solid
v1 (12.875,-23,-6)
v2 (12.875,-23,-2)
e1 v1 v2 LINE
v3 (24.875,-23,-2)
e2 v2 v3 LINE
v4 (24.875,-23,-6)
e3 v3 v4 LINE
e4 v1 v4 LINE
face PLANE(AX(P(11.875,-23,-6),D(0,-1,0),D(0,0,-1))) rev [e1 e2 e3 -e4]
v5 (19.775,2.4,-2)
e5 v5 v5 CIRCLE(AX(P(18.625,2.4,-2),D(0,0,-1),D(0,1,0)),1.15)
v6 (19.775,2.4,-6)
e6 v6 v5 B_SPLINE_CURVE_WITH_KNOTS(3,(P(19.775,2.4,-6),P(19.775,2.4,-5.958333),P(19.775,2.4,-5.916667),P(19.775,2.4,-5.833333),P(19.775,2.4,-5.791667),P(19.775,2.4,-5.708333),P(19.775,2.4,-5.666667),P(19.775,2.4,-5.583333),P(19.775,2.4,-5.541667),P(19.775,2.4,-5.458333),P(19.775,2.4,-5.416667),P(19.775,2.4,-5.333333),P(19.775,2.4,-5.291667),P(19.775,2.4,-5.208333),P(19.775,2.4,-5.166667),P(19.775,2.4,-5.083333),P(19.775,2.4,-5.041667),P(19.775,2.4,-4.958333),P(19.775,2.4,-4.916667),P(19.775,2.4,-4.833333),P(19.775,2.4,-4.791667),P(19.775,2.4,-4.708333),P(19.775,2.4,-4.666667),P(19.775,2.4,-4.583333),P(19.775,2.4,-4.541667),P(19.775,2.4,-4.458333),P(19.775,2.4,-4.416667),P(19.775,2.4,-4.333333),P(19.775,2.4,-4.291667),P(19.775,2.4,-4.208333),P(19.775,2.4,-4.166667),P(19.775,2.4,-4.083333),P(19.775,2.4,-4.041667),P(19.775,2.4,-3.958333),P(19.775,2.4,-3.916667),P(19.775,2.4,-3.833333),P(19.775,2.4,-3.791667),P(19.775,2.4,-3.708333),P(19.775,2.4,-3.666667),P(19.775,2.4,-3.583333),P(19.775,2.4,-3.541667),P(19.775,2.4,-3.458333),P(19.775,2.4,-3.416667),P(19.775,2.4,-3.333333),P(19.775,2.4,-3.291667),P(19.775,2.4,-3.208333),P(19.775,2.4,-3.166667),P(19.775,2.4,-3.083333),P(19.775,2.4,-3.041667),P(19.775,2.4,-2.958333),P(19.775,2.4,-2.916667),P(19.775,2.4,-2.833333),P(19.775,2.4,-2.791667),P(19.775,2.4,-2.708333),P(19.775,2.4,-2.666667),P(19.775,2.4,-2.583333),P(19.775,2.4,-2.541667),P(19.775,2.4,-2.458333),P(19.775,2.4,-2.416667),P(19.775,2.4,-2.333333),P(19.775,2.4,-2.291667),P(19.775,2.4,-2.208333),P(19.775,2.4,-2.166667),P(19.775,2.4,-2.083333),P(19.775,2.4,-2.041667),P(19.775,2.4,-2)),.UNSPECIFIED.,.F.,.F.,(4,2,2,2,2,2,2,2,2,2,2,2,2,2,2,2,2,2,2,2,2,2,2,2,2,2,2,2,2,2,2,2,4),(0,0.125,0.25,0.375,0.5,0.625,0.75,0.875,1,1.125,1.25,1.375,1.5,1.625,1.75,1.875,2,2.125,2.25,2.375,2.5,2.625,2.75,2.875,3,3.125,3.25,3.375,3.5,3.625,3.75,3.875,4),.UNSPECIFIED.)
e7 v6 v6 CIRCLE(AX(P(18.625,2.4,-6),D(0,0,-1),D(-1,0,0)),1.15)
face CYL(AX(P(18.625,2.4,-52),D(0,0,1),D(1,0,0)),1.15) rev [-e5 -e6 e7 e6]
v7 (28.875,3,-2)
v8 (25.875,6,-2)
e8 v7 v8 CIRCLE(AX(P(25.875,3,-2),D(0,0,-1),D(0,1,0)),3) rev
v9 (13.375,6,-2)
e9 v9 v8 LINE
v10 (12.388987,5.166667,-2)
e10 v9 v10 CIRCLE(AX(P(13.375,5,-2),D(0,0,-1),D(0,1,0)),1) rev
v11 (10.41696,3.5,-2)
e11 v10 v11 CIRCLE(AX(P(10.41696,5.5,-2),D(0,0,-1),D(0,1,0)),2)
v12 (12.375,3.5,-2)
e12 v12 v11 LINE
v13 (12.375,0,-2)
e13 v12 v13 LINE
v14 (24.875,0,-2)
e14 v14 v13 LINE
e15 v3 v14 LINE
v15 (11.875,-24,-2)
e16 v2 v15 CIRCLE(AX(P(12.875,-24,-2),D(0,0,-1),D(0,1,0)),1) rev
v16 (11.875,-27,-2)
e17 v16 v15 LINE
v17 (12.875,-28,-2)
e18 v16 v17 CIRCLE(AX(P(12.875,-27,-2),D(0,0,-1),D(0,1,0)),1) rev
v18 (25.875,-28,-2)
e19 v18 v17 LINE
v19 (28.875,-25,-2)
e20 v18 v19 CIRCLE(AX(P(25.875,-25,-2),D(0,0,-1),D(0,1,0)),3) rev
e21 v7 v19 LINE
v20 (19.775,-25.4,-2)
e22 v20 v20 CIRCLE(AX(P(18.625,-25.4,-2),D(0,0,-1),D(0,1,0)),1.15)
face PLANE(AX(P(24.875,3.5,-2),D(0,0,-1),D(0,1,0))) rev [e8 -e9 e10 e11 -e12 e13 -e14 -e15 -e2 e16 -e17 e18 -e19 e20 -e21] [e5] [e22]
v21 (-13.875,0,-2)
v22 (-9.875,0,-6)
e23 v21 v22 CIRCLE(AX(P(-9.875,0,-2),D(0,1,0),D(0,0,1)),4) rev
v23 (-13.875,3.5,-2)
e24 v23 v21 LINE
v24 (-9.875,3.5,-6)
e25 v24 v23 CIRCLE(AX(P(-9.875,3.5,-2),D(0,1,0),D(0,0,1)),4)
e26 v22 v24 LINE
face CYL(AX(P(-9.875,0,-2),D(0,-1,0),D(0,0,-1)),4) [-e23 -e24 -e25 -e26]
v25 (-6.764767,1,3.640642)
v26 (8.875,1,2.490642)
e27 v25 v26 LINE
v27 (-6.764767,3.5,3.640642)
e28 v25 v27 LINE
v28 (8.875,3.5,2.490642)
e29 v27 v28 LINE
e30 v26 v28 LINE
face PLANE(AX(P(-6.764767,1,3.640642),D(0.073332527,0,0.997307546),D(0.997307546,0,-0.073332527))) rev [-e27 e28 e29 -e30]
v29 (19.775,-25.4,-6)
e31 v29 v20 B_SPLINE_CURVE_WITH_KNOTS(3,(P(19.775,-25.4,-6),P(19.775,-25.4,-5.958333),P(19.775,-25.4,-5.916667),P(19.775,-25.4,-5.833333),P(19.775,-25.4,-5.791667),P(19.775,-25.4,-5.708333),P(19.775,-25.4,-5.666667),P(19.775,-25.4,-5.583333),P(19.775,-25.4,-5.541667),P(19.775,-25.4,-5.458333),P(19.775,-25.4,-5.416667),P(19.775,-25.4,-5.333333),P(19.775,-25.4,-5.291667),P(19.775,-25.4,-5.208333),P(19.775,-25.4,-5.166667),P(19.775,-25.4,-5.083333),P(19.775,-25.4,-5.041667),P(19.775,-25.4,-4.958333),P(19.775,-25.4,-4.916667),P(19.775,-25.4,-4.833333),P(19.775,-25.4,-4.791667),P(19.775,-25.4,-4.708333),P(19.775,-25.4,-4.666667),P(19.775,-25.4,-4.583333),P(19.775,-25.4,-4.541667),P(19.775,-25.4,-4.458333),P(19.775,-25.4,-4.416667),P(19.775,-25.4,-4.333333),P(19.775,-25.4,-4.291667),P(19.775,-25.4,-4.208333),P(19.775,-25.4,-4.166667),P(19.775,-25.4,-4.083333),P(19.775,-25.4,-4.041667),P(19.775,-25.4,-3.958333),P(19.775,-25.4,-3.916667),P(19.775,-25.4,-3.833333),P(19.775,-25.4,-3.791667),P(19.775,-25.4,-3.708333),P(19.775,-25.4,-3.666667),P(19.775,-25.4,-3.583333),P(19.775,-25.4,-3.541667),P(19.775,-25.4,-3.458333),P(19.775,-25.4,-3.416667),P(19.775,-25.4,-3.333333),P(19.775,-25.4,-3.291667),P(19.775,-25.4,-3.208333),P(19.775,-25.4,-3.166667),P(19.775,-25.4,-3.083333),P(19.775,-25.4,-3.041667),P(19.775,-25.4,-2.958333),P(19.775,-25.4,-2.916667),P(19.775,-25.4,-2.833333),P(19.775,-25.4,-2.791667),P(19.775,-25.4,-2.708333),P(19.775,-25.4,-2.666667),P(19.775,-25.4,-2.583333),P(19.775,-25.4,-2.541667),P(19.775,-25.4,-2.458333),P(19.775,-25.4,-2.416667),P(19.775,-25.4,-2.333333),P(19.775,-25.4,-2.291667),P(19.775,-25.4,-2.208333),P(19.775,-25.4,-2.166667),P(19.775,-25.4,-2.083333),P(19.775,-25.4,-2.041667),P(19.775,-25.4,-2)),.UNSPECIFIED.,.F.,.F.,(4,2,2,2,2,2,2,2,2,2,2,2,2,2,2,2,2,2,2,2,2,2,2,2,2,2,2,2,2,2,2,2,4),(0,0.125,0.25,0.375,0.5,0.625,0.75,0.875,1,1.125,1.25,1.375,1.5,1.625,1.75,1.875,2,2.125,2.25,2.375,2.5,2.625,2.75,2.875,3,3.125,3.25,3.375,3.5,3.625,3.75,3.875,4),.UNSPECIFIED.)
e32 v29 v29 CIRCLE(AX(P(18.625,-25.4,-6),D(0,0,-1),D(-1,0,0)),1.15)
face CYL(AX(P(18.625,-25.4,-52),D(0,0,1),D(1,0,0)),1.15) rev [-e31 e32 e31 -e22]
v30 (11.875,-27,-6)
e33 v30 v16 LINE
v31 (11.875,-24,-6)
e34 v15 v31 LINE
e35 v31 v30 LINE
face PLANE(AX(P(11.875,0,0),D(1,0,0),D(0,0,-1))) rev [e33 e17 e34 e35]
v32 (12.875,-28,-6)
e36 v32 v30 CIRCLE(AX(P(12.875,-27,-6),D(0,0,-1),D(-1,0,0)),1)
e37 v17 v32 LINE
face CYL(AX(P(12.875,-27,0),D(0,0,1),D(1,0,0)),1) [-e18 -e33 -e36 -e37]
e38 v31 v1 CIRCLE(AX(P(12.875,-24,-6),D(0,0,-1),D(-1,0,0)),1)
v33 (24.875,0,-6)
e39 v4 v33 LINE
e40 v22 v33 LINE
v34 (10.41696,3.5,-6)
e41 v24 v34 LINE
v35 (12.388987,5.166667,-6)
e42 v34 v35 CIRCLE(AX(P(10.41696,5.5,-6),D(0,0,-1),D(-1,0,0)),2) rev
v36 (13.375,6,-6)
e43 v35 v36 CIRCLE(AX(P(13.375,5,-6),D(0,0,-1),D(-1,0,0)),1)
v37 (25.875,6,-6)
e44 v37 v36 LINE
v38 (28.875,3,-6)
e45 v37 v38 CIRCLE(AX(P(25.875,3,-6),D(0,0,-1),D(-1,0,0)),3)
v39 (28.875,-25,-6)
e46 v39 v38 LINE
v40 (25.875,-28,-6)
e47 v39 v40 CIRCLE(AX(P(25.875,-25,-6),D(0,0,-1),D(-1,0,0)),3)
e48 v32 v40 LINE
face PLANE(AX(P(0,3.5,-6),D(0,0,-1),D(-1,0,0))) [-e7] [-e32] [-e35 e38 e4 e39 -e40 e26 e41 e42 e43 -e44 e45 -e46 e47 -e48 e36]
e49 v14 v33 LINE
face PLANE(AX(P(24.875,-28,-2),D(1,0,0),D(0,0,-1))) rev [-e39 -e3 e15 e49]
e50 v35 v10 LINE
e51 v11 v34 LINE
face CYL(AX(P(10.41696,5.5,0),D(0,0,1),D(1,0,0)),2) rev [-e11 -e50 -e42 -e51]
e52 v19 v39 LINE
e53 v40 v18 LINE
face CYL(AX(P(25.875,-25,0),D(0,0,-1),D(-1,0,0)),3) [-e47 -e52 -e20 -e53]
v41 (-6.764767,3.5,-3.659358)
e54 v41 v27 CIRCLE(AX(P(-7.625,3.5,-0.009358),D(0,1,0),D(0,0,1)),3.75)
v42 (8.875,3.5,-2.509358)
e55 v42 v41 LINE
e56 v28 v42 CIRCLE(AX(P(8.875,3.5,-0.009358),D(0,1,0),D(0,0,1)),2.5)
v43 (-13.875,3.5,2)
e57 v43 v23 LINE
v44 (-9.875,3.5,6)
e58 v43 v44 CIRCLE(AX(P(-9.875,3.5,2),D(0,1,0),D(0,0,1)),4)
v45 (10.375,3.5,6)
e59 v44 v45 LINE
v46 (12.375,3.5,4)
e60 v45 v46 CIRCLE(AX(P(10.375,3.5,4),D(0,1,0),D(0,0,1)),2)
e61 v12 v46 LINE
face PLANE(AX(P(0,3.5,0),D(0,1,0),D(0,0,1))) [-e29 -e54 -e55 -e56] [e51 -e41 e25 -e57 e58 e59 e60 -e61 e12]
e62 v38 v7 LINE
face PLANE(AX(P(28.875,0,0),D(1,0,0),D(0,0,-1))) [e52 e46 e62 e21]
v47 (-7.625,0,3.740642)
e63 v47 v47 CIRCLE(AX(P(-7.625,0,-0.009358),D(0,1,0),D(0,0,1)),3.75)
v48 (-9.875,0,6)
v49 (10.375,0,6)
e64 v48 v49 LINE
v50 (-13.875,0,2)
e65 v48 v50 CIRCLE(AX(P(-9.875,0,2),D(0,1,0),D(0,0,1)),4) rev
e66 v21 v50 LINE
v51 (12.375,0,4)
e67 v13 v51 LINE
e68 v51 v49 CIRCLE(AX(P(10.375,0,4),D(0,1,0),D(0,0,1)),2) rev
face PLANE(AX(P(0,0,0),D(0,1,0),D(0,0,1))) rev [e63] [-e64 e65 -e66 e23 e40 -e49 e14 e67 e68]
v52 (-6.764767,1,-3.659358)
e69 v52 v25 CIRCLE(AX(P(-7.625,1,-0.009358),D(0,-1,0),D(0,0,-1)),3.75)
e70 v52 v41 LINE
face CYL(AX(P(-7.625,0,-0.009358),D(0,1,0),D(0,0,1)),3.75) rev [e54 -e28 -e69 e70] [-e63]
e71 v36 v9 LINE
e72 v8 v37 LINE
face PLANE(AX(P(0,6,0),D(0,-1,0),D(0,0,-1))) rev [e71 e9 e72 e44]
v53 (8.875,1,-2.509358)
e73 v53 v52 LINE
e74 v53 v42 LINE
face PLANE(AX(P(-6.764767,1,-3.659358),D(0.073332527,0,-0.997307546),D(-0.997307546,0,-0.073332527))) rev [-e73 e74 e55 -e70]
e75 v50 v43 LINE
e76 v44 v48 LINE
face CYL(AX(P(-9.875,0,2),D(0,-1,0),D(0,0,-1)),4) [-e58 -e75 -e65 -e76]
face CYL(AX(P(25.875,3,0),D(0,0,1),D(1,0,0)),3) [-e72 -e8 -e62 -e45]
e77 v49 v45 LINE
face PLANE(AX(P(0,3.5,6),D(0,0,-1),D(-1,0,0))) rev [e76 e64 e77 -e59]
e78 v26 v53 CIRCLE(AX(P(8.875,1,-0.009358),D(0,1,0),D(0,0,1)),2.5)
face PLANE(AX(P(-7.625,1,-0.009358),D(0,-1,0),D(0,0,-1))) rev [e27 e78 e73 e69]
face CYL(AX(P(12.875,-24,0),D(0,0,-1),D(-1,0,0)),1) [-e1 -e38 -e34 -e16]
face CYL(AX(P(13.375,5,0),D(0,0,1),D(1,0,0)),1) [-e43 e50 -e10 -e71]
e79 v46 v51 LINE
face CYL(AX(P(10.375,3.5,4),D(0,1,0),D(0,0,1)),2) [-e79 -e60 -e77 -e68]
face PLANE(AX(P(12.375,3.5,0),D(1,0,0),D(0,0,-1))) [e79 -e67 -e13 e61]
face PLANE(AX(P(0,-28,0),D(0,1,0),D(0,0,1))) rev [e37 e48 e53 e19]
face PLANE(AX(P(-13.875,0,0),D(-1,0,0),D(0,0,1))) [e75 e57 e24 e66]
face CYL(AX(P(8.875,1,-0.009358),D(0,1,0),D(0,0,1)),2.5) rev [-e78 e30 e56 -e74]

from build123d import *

# Parameters (mm, degrees)
SKETCH1_W               = 24.75
SKETCH1_H               = 12
BOSS_EXTRUDE1_DEPTH     = 3.5
SKETCH2_R               = 3.75
CUT_EXTRUDE1_DEPTH      = 15.191216474
CUT_EXTRUDE4_DEPTH      = 2.5
SKETCH5_W               = 4
SKETCH5_H               = 3.5
BOSS_EXTRUDE2_DEPTH     = 12.5
SKETCH6_W               = 4
SKETCH6_H               = 3.5
BOSS_EXTRUDE3_DEPTH     = 4
SKETCH7_W               = 4
SKETCH7_H               = 4
BOSS_EXTRUDE4_DEPTH     = 28
SKETCH8_W               = 4
SKETCH8_H               = 5
BOSS_EXTRUDE5_DEPTH     = 13
SKETCH9_W               = 16.5
SKETCH9_H               = 4
BOSS_EXTRUDE6_DEPTH     = 2.5
CUT_EXTRUDE5_DEPTH      = 42.009335827
CUT_EXTRUDE5_DEPTH_BACK = 50
SKETCH10_R              = 1.15
FILLET4_R               = 1
SKETCH13_W              = 12
SKETCH13_H              = 3.5
BOSS_EXTRUDE7_DEPTH     = 1.5
FILLET5_R               = 4
FILLET6_R               = 4
FILLET7_R               = 2
FILLET8_R               = 3
FILLET9_R               = 2


with BuildPart() as part:
    # Sketch1 → Boss-Extrude1 (new body)
    with BuildSketch(Plane(origin=(0, 0, 0), x_dir=(1, 0, 0), z_dir=(0, 1, 0))):
        Rectangle(SKETCH1_W, SKETCH1_H)
    extrude(amount=BOSS_EXTRUDE1_DEPTH)

    # Sketch2 → Cut-Extrude1 (cut, through all)
    with BuildSketch(Plane(origin=(0, 3.5, 0), x_dir=(1, 0, 0), z_dir=(0, 1, 0))):
        with Locations(Location((-7.625, 0.009358416, 0), (0, 0, 270))):
            Circle(SKETCH2_R)
    extrude(amount=-CUT_EXTRUDE1_DEPTH, mode=Mode.SUBTRACT)

    # Sketch4 → Cut-Extrude4 (cut)
    with BuildSketch(Plane(origin=(0, 3.5, 0), x_dir=(1, 0, 0), z_dir=(0, 1, 0))):
        with BuildLine():
            Line((-6.764767473, 3.659358416), (8.875, 2.509358416))
            ThreePointArc((8.875, 2.509358416), (11.375, 0.009358416), (8.875, -2.490641584))
            Line((8.875, -2.490641584), (-6.764767473, -3.640641584))
            ThreePointArc((-6.764767473, -3.640641584), (-3.875, 0.009358416), (-6.764767473, 3.659358416))
        make_face()
    extrude(amount=-CUT_EXTRUDE4_DEPTH, mode=Mode.SUBTRACT)

    # Sketch5 → Boss-Extrude2 (add)
    with BuildSketch(Plane(origin=(12.375, 0, 0), x_dir=(0, 0, -1), z_dir=(1, 0, 0))):
        with Locations((4, 1.75)):
            Rectangle(SKETCH5_W, SKETCH5_H)
    extrude(amount=BOSS_EXTRUDE2_DEPTH)

    # Sketch6 → Boss-Extrude3 (add)
    with BuildSketch(Plane(origin=(24.875, 0, 0), x_dir=(0, 0, -1), z_dir=(1, 0, 0))):
        with Locations((4, 1.75)):
            Rectangle(SKETCH6_W, SKETCH6_H)
    extrude(amount=BOSS_EXTRUDE3_DEPTH)

    # Sketch7 → Boss-Extrude4 (add)
    with BuildSketch(Plane.XZ):
        with Locations((26.875, -4)):
            Rectangle(SKETCH7_W, SKETCH7_H)
    extrude(amount=BOSS_EXTRUDE4_DEPTH)

    # Sketch8 → Boss-Extrude5 (add)
    with BuildSketch(Plane.ZY.offset(-24.875)):
        with Locations((-4, -25.5)):
            Rectangle(SKETCH8_W, SKETCH8_H)
    extrude(amount=BOSS_EXTRUDE5_DEPTH)

    # Sketch9 → Boss-Extrude6 (add)
    with BuildSketch(Plane(origin=(0, 3.5, 0), x_dir=(1, 0, 0), z_dir=(0, 1, 0))):
        with Locations((20.625, 4)):
            Rectangle(SKETCH9_W, SKETCH9_H)
    extrude(amount=BOSS_EXTRUDE6_DEPTH)

    # Sketch10 → Cut-Extrude5 (cut, two sides: drawn at the far end of the back side and taken through both)
    with BuildSketch(Plane.XY.offset(-2).offset(-CUT_EXTRUDE5_DEPTH_BACK)):
        with Locations((18.625, 2.4)):
            Circle(SKETCH10_R)
        with Locations((18.625, -25.4)):
            Circle(SKETCH10_R)
    extrude(amount=CUT_EXTRUDE5_DEPTH + CUT_EXTRUDE5_DEPTH_BACK, mode=Mode.SUBTRACT)

    # Fillet4
    fillet4_edges = [part.edges().sort_by_distance(p)[0] for p in [
        (11.875, -28, -4),
        (11.875, -23, -4),
        (12.375, 6, -4),
    ]]
    fillet(fillet4_edges, radius=FILLET4_R)

    # Sketch13 → Boss-Extrude7 (add)
    with BuildSketch(Plane.ZY.offset(12.375)):
        with Locations((0, 1.75)):
            Rectangle(SKETCH13_W, SKETCH13_H)
    extrude(amount=BOSS_EXTRUDE7_DEPTH)

    # Fillet5
    fillet5_edges = [part.edges().sort_by_distance(p)[0] for p in [
        (-13.875, 1.75, 6),
    ]]
    fillet(fillet5_edges, radius=FILLET5_R)

    # Fillet6
    fillet6_edges = [part.edges().sort_by_distance(p)[0] for p in [
        (-13.875, 1.75, -6),
    ]]
    fillet(fillet6_edges, radius=FILLET6_R)

    # Fillet7
    fillet7_edges = [part.edges().sort_by_distance(p)[0] for p in [
        (12.375, 1.75, 6),
    ]]
    fillet(fillet7_edges, radius=FILLET7_R)

    # Fillet8
    fillet8_edges = [part.edges().sort_by_distance(p)[0] for p in [
        (28.875, -28, -4),
        (28.875, 6, -4),
    ]]
    fillet(fillet8_edges, radius=FILLET8_R)

    # Fillet9
    # the kernel refuses this fillet: 2 mm, written as the material it adds along each edge
    with BuildSketch(Plane(origin=(12.375, 3.5, -6), x_dir=(0.008391726197268362, 0.9999647888458023, 0), z_dir=(0, 0, 1))) as fillet9_piece_1:
        with BuildLine():
            CenterArc((1.983498243, 1.974754399), FILLET9_R, 180.480816137, 80.405931773)
            Line((-0.016431335, 1.957970947), (-0.216424292, 1.956292601))
            Line((-0.216424292, 1.956292601), (-0.199992958, -0.001678345))
            Line((-0.199992958, -0.001678345), (0.001678345, -0.199992958))
            ThreePointArc((0.001678345, -0.199992958), (1.501625529, -0.187405368), (1.635048065, -0.19747544))
            Line((1.635048065, -0.19747544), (1.666725354, 0))
        make_face()
    extrude(amount=4)


solid = part.part
